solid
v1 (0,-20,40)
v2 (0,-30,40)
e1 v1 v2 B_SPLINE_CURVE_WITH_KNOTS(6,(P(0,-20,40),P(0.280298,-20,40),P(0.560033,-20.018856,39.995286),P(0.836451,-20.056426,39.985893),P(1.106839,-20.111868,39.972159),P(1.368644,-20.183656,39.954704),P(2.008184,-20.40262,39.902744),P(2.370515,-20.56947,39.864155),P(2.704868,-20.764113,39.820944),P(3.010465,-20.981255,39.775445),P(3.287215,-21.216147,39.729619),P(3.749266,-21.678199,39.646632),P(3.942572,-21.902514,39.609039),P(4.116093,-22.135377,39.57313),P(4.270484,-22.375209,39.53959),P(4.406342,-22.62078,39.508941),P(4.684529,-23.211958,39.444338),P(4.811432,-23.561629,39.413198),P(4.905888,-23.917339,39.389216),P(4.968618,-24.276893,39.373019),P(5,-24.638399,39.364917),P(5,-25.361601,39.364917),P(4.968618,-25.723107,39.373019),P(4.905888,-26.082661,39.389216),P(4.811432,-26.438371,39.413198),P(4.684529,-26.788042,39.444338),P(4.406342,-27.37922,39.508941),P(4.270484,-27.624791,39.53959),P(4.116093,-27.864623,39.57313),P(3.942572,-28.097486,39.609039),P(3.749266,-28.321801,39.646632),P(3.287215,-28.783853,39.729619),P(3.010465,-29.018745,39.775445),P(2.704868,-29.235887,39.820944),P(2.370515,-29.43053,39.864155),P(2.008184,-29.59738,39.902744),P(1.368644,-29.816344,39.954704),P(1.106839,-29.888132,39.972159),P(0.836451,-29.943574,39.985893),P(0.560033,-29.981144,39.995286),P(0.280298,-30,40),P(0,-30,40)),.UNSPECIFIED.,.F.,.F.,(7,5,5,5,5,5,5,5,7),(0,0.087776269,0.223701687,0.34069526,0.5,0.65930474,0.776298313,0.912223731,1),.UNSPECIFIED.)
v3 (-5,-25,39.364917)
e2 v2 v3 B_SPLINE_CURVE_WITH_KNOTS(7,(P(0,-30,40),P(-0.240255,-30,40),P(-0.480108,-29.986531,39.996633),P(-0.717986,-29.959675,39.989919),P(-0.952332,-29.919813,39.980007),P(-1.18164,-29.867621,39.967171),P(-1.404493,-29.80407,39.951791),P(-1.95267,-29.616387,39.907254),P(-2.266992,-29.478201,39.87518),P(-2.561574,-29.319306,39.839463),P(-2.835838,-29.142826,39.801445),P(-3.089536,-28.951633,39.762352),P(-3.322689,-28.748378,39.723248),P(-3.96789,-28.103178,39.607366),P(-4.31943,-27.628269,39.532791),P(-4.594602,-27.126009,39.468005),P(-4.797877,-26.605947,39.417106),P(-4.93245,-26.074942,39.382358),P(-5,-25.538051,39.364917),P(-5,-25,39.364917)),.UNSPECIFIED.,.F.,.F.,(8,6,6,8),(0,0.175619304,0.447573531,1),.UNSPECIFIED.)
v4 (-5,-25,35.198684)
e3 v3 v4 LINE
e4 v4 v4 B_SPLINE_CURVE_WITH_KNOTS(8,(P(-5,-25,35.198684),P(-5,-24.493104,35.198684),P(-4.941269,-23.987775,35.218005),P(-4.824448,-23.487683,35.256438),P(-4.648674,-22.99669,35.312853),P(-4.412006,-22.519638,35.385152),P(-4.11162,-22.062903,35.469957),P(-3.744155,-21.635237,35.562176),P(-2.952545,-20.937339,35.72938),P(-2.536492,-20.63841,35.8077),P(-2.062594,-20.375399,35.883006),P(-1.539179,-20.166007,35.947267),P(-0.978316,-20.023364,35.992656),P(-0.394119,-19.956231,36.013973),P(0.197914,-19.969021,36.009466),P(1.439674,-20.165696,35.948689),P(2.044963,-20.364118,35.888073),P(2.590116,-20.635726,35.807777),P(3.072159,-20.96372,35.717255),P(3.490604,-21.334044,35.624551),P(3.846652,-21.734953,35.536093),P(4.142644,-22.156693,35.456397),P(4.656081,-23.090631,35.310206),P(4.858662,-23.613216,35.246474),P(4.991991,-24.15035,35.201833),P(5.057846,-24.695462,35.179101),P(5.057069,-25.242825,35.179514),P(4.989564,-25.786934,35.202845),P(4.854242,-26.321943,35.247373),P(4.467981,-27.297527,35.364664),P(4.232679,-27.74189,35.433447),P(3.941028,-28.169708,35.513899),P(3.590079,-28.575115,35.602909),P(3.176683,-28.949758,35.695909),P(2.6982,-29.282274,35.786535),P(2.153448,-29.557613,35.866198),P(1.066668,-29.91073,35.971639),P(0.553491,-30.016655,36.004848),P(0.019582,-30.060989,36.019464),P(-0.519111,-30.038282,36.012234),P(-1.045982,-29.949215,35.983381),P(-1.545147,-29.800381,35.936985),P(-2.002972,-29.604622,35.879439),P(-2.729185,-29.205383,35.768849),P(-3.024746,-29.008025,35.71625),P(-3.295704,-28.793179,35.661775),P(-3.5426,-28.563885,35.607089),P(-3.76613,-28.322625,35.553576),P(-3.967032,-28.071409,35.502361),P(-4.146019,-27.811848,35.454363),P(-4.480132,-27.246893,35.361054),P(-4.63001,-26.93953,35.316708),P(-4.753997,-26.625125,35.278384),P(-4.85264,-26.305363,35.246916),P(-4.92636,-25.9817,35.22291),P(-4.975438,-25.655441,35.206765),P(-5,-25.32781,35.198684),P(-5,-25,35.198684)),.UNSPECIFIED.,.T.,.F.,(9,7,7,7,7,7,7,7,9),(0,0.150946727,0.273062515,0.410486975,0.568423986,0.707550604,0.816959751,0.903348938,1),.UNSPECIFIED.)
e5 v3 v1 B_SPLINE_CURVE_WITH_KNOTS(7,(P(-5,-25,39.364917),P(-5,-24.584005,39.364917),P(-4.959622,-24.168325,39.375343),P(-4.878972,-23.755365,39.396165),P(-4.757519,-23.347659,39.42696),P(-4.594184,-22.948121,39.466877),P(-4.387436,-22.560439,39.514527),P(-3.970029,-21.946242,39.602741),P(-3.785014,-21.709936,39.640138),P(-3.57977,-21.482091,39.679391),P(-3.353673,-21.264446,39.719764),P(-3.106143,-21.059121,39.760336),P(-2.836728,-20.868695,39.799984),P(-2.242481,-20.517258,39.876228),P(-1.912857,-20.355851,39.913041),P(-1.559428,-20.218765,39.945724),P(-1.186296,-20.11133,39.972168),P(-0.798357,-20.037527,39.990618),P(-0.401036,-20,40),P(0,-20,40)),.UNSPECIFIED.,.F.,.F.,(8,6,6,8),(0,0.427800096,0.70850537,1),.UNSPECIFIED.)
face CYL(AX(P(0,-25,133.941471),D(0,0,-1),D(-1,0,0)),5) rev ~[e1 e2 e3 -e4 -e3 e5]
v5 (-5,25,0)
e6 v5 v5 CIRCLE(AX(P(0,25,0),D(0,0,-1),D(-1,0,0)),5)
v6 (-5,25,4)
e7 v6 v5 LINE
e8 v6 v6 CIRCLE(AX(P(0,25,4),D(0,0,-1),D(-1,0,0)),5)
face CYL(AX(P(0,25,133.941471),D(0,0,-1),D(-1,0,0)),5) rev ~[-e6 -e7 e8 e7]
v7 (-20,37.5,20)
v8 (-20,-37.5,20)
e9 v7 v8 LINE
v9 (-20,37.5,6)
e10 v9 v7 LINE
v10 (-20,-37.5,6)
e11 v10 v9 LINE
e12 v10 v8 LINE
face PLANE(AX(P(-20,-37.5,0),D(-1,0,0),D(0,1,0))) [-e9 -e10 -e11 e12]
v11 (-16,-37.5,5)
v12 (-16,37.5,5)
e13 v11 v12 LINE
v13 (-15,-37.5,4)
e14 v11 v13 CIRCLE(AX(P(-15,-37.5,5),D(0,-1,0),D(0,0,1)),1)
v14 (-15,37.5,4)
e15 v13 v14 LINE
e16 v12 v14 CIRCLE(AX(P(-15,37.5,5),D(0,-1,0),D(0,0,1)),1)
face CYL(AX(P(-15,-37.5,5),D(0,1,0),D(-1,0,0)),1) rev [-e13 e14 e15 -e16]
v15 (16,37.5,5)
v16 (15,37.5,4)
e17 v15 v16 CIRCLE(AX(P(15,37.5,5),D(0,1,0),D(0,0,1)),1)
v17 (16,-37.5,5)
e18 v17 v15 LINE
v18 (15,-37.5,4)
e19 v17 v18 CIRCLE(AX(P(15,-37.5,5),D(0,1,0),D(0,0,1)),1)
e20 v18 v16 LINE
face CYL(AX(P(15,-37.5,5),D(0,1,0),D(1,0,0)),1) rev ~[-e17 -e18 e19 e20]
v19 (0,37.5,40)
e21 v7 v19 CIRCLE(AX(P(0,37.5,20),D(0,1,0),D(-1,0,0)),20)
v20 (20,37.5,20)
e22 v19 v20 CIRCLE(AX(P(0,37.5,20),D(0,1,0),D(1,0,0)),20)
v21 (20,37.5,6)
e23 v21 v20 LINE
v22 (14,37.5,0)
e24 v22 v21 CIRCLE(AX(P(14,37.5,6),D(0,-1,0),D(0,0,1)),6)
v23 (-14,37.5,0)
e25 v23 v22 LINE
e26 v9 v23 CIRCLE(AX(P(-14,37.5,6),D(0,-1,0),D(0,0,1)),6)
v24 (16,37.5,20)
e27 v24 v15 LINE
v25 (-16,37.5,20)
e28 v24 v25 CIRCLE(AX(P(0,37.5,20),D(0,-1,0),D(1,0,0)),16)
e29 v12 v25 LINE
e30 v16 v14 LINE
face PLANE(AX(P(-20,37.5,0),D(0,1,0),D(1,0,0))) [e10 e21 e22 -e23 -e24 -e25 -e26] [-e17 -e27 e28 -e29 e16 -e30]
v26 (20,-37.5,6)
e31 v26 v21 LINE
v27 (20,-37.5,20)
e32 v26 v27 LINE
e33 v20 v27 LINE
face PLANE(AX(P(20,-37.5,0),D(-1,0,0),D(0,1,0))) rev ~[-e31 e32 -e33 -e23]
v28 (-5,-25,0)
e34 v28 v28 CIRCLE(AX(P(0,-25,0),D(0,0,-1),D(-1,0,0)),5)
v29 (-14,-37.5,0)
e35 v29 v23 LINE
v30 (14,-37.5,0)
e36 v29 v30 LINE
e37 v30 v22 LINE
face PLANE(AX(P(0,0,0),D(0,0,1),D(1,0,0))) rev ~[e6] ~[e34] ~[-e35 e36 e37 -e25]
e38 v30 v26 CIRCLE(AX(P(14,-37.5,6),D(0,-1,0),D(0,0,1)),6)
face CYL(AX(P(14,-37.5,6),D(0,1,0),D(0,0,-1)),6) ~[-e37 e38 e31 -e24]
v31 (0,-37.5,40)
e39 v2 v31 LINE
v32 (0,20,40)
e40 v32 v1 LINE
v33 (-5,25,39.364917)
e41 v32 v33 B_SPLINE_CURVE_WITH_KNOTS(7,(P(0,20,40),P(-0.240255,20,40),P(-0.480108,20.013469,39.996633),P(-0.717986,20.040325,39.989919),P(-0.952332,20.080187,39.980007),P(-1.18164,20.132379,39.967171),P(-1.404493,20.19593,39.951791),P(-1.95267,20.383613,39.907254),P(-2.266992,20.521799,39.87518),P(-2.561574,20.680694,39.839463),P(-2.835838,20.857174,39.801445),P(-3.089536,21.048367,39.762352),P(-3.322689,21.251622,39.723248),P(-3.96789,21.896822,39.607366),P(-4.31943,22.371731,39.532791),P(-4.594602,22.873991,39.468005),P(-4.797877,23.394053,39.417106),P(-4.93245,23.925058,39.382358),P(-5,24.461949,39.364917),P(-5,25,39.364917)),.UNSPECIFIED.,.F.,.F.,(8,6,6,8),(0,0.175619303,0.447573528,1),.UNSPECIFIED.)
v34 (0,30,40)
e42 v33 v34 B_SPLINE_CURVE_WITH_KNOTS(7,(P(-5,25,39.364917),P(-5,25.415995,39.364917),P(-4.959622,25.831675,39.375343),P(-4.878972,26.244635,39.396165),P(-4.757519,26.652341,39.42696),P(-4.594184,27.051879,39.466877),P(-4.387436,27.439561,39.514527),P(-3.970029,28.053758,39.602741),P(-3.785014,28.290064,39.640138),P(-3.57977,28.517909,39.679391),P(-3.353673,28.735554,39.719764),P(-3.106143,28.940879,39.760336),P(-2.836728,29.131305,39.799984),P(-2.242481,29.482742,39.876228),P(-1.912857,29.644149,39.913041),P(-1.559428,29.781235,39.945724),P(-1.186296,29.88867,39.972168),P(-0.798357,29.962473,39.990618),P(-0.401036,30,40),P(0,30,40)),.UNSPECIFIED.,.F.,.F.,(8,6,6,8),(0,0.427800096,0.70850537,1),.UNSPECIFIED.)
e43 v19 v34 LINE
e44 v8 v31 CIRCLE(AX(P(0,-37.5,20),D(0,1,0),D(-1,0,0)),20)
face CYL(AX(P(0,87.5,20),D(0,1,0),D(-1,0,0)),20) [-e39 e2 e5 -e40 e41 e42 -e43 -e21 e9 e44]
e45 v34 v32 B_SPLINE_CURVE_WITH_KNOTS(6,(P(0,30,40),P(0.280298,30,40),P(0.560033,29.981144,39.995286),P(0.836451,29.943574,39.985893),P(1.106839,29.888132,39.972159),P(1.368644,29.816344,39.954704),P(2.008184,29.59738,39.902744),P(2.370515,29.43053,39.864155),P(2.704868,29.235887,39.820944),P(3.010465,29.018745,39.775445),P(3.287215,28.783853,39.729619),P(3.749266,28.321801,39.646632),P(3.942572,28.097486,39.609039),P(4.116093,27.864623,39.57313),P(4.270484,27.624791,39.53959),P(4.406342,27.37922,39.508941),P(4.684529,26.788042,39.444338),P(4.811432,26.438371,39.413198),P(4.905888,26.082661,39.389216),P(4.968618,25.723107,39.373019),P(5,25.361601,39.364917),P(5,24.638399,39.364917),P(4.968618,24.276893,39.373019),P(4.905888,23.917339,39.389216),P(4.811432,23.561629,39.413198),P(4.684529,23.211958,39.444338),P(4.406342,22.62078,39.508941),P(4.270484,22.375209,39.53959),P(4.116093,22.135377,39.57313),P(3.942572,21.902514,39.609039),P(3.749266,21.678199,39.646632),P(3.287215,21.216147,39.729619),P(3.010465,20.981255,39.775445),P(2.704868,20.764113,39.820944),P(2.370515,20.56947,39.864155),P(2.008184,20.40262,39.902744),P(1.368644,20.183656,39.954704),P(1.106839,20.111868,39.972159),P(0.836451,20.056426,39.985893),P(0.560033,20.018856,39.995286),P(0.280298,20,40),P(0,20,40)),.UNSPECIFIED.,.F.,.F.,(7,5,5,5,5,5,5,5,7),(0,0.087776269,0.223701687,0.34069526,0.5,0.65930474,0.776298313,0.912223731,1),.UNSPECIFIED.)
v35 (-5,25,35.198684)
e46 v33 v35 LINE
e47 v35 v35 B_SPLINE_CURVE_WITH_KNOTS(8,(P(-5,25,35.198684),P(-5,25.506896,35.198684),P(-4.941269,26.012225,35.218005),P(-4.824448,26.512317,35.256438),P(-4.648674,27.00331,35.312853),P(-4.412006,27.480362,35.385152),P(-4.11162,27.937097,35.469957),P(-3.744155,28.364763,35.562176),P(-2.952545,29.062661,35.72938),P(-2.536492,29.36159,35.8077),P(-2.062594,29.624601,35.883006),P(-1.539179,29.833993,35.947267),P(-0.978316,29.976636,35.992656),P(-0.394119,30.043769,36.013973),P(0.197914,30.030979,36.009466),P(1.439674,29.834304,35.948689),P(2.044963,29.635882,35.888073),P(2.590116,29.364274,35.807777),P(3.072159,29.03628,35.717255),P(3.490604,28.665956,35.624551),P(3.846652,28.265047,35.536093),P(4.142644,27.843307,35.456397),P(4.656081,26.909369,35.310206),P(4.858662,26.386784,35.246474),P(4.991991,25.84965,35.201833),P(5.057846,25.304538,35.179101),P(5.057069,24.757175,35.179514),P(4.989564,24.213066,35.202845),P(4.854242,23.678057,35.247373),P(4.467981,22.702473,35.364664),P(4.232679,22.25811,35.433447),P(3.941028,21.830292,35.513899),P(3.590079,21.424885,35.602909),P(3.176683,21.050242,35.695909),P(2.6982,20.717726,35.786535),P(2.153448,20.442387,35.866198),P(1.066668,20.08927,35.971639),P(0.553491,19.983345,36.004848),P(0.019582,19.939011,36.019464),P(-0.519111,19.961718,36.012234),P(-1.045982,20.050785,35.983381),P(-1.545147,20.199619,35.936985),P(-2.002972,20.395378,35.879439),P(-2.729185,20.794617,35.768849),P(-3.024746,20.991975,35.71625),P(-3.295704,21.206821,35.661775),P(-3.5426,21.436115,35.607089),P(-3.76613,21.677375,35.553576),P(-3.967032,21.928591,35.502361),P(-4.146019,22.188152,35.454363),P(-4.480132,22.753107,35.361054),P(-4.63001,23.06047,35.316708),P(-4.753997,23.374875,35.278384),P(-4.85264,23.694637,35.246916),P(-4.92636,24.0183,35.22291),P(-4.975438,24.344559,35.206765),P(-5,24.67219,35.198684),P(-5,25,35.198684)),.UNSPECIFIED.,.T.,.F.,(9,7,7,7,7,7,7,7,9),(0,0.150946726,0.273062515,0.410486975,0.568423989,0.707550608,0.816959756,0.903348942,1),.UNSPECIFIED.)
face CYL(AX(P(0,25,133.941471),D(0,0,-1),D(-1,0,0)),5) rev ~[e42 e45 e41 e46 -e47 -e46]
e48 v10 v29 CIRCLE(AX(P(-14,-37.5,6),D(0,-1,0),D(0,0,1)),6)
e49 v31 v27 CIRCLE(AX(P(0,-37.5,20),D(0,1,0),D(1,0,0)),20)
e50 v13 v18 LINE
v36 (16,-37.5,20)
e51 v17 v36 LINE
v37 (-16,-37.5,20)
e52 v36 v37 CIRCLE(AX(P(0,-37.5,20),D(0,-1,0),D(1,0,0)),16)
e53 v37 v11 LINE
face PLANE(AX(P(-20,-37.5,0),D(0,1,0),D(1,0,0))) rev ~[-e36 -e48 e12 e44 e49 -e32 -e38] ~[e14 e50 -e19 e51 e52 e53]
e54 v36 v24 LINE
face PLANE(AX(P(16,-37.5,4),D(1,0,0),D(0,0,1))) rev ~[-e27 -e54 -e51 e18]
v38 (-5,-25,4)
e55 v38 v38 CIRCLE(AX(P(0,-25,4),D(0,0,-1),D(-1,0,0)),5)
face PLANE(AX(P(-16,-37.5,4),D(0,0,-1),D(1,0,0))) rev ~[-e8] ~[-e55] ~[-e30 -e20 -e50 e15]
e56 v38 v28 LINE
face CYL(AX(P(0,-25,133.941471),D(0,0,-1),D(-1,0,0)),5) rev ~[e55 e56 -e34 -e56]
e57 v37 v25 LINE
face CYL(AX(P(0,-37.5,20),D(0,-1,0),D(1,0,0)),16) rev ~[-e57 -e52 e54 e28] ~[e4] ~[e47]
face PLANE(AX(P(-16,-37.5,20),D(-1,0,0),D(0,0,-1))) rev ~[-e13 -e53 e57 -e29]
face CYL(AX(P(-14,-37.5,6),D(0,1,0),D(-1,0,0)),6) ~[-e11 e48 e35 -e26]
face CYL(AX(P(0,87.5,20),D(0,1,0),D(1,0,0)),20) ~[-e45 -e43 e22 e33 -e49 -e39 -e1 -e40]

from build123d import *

# Parameters (mm, degrees)
F0_W        = 40
F0_H        = 75
F1_DEPTH    = 40
F3_D        = 10
F4_T1_DEPTH = 175
F5_T1_DEPTH = 175
F6_R        = 6
F8_DEPTH    = 75.0010001
F9_R        = 1


# Not quite as in the source:
# - a fillet or chamfer that OpenCascade refuses, or shapes differently, is made with other operations: its cross-section is extruded or revolved along the edge and cut away or added


with BuildPart() as f1:
    # F0 (on Top) → F1 (new body)
    with BuildSketch(Plane.XY):
        Rectangle(F0_W, F0_H)
    extrude(amount=F1_DEPTH)

    # F3 (through all)
    with Locations(Plane.XY.offset(40)):
        with Locations((0, 25), (0, -25)):
            Hole(F3_D / 2)

    # F4: fillet of radius 20 on 1 edges, made by hand

    # F4_s2 → F4_t1 (cut)
    with BuildSketch(Plane.XZ.offset(-87.5)):
        with BuildLine():
            ThreePointArc((20, 20), (14.1421356237, 34.1421356237), (0, 40))
            Line((0, 40), (20, 40))
            Line((20, 40), (20, 20))
        make_face()
    extrude(amount=F4_T1_DEPTH, mode=Mode.SUBTRACT)

    # F5: fillet of radius 20 on 1 edges, made by hand

    # F5_s2 → F5_t1 (cut)
    with BuildSketch(Plane.XZ.offset(-87.5)):
        with BuildLine():
            ThreePointArc((-20, 20), (-14.1421356237, 34.1421356237), (0, 40))
            Line((0, 40), (-20, 40))
            Line((-20, 40), (-20, 20))
        make_face()
    extrude(amount=F5_T1_DEPTH, mode=Mode.SUBTRACT)

    # F6
    f6_edges = [f1.edges().sort_by_distance(p)[0] for p in [
        (-20, 0, 0),
        (20, 0, 0),
    ]]
    fillet(f6_edges, radius=F6_R)

    # F7 (on face) → F8 (cut, through all)
    with BuildSketch(Plane.XZ.offset(37.5)):
        with BuildLine():
            Line((-16, 20), (-16, 4))
            Line((-16, 4), (16, 4))
            Line((16, 4), (16, 20))
            ThreePointArc((16, 20), (0, 36), (-16, 20))
        make_face()
    extrude(amount=-F8_DEPTH, mode=Mode.SUBTRACT)

    # F9
    f9_edges = [f1.edges().sort_by_distance(p)[0] for p in [
        (-16, 0, 4),
        (16, 0, 4),
    ]]
    fillet(f9_edges, radius=F9_R)


solid = f1.part
